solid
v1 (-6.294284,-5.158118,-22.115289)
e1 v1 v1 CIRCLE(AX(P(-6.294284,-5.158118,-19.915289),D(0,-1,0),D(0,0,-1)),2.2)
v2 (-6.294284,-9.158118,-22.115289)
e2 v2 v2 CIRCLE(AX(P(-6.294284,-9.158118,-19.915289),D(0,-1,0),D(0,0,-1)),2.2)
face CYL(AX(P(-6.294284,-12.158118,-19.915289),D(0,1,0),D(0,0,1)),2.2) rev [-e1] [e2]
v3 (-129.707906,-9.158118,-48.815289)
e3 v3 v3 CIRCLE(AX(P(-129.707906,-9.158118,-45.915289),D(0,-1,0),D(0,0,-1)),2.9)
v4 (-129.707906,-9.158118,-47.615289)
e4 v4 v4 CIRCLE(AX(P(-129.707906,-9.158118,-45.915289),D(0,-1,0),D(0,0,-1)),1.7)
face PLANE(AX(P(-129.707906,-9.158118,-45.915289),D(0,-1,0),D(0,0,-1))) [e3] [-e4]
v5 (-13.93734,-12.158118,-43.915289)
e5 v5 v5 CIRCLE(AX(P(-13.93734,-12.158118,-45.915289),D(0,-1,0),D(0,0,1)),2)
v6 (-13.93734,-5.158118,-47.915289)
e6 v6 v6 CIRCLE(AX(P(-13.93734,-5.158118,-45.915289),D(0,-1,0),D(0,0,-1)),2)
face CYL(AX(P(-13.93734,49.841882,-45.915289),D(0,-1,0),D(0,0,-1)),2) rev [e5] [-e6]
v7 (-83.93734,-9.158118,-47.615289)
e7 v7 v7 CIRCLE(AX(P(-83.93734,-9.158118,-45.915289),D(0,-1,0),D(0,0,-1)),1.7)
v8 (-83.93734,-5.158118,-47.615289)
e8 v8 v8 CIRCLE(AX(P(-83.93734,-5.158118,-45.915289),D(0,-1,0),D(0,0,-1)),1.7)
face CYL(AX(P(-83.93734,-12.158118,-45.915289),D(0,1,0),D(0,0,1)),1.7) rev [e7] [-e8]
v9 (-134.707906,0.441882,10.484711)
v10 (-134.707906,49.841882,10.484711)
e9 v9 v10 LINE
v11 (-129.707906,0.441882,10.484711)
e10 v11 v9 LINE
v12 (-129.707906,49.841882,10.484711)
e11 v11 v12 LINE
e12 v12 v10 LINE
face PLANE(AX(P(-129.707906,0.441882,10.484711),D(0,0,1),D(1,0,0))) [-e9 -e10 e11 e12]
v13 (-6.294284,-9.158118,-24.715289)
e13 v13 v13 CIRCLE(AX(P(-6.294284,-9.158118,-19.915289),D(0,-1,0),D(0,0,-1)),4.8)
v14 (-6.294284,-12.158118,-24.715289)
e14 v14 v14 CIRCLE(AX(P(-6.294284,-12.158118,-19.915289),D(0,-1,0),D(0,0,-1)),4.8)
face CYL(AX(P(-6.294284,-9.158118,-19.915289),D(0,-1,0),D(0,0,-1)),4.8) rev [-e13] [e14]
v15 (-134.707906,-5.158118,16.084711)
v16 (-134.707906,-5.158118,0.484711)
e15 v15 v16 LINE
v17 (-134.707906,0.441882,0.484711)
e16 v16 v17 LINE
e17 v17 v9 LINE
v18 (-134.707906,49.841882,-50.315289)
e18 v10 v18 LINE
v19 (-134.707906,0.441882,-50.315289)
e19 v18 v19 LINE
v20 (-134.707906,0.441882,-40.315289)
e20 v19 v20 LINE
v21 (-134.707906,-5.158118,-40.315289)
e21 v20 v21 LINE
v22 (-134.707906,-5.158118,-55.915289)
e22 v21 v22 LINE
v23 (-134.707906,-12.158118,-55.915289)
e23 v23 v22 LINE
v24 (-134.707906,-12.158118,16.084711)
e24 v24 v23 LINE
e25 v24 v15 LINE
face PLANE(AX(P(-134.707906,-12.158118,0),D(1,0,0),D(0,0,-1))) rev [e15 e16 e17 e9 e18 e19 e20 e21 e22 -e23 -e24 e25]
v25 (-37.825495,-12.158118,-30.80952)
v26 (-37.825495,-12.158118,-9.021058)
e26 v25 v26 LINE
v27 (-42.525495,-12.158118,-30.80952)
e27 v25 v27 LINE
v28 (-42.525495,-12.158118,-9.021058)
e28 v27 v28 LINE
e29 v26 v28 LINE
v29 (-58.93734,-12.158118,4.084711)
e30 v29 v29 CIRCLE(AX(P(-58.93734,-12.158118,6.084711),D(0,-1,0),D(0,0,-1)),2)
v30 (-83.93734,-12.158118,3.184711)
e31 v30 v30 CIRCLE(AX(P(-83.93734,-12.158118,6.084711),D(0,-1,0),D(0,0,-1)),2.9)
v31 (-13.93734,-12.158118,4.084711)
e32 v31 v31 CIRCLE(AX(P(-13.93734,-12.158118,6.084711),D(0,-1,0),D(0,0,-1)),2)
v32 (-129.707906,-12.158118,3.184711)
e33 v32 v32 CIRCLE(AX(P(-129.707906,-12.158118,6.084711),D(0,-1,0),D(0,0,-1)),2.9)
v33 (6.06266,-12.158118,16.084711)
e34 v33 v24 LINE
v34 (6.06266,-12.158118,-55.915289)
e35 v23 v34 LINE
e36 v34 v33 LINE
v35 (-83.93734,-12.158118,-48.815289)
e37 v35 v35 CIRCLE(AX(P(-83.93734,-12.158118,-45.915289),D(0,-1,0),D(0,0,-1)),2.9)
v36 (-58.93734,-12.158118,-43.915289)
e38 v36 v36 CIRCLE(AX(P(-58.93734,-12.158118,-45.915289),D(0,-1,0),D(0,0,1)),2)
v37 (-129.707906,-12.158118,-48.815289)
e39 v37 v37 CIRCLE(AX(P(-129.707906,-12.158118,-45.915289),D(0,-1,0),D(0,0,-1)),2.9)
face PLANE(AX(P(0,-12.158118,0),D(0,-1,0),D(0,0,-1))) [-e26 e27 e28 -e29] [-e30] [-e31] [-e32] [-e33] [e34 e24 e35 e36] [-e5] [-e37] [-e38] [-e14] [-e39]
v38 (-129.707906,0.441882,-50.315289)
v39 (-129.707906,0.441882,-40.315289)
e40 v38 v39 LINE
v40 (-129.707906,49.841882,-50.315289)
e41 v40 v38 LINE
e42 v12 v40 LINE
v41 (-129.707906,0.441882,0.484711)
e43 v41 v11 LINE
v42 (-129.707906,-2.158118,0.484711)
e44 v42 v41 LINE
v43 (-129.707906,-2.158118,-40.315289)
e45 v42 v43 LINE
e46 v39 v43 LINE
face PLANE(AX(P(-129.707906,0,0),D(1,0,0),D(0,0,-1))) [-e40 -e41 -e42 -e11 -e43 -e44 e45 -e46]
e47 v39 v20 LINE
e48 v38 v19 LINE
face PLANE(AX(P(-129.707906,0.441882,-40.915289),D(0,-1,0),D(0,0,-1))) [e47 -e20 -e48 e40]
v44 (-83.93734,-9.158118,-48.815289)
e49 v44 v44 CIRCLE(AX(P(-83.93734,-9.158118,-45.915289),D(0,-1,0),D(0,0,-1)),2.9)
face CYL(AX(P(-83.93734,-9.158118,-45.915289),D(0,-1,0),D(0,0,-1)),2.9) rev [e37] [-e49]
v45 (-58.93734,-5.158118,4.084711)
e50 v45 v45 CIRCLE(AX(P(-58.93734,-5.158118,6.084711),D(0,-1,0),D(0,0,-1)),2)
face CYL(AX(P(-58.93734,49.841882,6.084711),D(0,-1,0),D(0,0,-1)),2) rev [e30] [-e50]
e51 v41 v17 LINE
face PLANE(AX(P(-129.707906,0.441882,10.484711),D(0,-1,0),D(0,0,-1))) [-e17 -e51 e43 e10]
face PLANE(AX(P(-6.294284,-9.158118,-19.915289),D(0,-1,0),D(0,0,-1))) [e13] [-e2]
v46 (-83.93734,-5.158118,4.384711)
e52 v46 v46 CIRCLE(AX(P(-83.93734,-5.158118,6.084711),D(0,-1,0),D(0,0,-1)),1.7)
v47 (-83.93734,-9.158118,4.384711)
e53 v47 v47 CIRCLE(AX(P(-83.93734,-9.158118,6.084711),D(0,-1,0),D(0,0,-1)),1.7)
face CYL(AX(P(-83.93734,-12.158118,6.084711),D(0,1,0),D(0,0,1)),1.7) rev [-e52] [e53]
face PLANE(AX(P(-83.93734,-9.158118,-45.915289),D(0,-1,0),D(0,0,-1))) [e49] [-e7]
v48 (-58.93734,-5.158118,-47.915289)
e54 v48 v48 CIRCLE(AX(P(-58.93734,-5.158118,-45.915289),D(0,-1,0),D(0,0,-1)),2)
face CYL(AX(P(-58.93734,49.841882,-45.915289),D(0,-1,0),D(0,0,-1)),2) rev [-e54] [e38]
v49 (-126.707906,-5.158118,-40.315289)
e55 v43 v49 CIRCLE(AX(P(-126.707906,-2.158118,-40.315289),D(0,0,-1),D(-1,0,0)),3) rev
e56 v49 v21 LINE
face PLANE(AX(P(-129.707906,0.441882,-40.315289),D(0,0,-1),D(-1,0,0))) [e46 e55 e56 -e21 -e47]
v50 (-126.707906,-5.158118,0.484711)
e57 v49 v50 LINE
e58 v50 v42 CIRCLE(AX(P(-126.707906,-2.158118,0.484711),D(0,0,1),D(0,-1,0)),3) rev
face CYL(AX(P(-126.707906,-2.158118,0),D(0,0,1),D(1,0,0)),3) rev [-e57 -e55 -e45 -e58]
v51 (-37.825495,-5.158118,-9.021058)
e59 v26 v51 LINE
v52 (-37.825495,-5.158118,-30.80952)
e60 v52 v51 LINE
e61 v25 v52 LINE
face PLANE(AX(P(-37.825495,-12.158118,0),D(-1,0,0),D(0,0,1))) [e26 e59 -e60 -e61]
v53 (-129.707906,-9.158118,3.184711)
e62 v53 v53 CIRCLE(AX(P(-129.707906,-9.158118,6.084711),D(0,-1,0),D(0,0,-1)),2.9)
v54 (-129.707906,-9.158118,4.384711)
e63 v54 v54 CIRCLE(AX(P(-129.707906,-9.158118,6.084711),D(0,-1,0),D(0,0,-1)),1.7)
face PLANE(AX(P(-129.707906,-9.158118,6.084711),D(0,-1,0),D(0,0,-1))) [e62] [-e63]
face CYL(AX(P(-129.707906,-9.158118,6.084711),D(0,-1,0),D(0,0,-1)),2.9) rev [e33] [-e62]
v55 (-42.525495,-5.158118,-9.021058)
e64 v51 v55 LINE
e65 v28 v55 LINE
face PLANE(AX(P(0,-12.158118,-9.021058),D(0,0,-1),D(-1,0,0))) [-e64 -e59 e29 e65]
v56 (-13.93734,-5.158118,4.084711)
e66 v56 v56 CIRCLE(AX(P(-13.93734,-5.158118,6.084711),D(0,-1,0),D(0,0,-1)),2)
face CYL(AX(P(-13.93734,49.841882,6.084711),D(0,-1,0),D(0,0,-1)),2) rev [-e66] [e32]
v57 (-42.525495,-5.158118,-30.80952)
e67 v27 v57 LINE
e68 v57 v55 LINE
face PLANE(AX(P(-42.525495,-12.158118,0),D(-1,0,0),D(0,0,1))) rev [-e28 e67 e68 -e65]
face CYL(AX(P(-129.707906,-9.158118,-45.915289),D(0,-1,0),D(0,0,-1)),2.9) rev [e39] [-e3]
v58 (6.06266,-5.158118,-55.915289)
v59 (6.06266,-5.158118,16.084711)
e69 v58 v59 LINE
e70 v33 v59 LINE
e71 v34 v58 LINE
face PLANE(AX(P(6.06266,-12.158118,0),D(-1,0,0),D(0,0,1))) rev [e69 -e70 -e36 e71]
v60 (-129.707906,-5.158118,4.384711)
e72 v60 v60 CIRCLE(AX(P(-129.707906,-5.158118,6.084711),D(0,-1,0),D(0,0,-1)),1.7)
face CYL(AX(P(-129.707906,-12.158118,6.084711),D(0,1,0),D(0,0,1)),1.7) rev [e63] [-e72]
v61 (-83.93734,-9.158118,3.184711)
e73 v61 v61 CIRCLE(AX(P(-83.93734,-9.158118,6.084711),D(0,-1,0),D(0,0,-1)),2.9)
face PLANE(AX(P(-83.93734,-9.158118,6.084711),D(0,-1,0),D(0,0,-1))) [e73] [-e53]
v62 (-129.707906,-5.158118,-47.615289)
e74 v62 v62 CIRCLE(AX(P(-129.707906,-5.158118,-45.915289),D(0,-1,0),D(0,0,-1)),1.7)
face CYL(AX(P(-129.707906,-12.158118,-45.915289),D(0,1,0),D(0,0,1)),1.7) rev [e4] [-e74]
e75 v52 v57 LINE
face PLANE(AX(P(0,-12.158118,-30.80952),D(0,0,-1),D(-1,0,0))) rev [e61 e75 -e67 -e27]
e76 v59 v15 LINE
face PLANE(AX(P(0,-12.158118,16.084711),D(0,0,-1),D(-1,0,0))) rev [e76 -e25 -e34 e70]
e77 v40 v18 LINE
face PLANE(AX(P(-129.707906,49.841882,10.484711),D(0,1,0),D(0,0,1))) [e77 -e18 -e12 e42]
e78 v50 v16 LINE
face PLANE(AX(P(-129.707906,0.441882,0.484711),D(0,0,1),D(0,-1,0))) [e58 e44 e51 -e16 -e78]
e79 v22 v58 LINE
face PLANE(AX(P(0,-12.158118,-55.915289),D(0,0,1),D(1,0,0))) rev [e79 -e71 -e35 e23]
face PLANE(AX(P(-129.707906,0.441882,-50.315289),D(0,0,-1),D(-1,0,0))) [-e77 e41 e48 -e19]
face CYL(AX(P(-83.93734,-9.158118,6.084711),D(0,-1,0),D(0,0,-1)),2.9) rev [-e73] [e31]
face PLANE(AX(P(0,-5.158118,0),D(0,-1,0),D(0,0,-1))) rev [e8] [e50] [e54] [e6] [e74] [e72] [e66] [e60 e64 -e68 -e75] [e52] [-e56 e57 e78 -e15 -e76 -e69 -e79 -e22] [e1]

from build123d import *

# Parameters (mm, degrees)
EXTRUDE_2_OUTLINE_W   = 140.770566096
EXTRUDE_2_OUTLINE_H   = 72
EXTRUDE_2_OUTLINE_R   = 1.7
EXTRUDE_2_OUTLINE_W_2 = 4.7
EXTRUDE_2_OUTLINE_H_2 = 21.788461539
EXTRUDE_2_OUTLINE_R_2 = 2.2
EXTRUDE_2_DEPTH       = 7
SKETCH_2_R            = 2.9
SKETCH_2_R_2          = 4.8
CUT_EXTRUDE_1_DEPTH   = 3
EXTRUDE_3_DEPTH       = 5
FILLET_1_R            = 3
SKETCH_4_R            = 2
CUT_EXTRUDE_2_DEPTH   = 159.482615774


# Read off the part's stored shape, not the designer's step: 填料-伸長2
with BuildPart() as part:
    # 填料-伸長2 outline → 填料-伸長2 (new body)
    with BuildSketch(Plane.XZ.offset(5.158117597)):
        with Locations((-64.32262294, -19.915289206)):
            Rectangle(EXTRUDE_2_OUTLINE_W, EXTRUDE_2_OUTLINE_H)
        with Locations((-129.707905988, -45.915289206)):
            Circle(EXTRUDE_2_OUTLINE_R, mode=Mode.SUBTRACT)
        with Locations((-83.937339892, -45.915289206)):
            Circle(EXTRUDE_2_OUTLINE_R, mode=Mode.SUBTRACT)
        with Locations((-40.175495169, -19.915289206)):
            Rectangle(EXTRUDE_2_OUTLINE_W_2, EXTRUDE_2_OUTLINE_H_2, mode=Mode.SUBTRACT)
        with Locations((-129.707905988, 6.084710794)):
            Circle(EXTRUDE_2_OUTLINE_R, mode=Mode.SUBTRACT)
        with Locations((-83.937339892, 6.084710794)):
            Circle(EXTRUDE_2_OUTLINE_R, mode=Mode.SUBTRACT)
        with Locations((-6.29428449, -19.915289206)):
            Circle(EXTRUDE_2_OUTLINE_R_2, mode=Mode.SUBTRACT)
    extrude(amount=EXTRUDE_2_DEPTH)

    # 草圖2 → 除料-伸長1 (cut)
    with BuildSketch(Plane.XZ.offset(12.158117597)):
        with Locations(Location((-129.707905988, -45.915289206, 0), (0, 0, 270))):
            Circle(SKETCH_2_R)
        with Locations(Location((-129.707905988, 6.084710794, 0), (0, 0, 270))):
            Circle(SKETCH_2_R)
        with Locations(Location((-83.937339892, 6.084710794, 0), (0, 0, 270))):
            Circle(SKETCH_2_R)
        with Locations(Location((-83.937339892, -45.915289206, 0), (0, 0, 270))):
            Circle(SKETCH_2_R)
        with Locations(Location((-6.29428449, -19.915289206, 0), (0, 0, 270))):
            Circle(SKETCH_2_R_2)
    extrude(amount=-CUT_EXTRUDE_1_DEPTH, mode=Mode.SUBTRACT)

    # 草圖3 → 填料-伸長3 (add)
    with BuildSketch(Plane.ZY.offset(134.707905988)):
        Polygon((0.484710794, -5.158117597), (-40.315289206, -5.158117597), (-40.315289206, 0.441882403), (-40.915289206, 0.441882403), (-50.315289206, 0.441882403), (-50.315289206, 49.841882403), (10.484710794, 49.841882403), (10.484710794, 0.441882403), (1.084710794, 0.441882403), (0.484710794, 0.441882403), align=None)
    extrude(amount=-EXTRUDE_3_DEPTH)

    # 圓角1
    fillet_1_edges = [part.edges().sort_by_distance(p)[0] for p in [
        (-129.707905988, -5.158117597, -19.915289206),
    ]]
    fillet(fillet_1_edges, radius=FILLET_1_R)

    # 草圖4 → 除料-伸長2 (cut, through all)
    with BuildSketch(Plane.XZ.offset(12.158117597)):
        with Locations(Location((-58.937339892, 6.084710794, 0), (0, 0, 270))):
            Circle(SKETCH_4_R)
        with Locations(Location((-13.937339892, 6.084710794, 0), (0, 0, 270))):
            Circle(SKETCH_4_R)
        with Locations(Location((-13.937339892, -45.915289206, 0), (0, 0, 270))):
            Circle(SKETCH_4_R)
        with Locations(Location((-58.937339892, -45.915289206, 0), (0, 0, 270))):
            Circle(SKETCH_4_R)
    extrude(amount=-CUT_EXTRUDE_2_DEPTH, mode=Mode.SUBTRACT)


solid = part.part
